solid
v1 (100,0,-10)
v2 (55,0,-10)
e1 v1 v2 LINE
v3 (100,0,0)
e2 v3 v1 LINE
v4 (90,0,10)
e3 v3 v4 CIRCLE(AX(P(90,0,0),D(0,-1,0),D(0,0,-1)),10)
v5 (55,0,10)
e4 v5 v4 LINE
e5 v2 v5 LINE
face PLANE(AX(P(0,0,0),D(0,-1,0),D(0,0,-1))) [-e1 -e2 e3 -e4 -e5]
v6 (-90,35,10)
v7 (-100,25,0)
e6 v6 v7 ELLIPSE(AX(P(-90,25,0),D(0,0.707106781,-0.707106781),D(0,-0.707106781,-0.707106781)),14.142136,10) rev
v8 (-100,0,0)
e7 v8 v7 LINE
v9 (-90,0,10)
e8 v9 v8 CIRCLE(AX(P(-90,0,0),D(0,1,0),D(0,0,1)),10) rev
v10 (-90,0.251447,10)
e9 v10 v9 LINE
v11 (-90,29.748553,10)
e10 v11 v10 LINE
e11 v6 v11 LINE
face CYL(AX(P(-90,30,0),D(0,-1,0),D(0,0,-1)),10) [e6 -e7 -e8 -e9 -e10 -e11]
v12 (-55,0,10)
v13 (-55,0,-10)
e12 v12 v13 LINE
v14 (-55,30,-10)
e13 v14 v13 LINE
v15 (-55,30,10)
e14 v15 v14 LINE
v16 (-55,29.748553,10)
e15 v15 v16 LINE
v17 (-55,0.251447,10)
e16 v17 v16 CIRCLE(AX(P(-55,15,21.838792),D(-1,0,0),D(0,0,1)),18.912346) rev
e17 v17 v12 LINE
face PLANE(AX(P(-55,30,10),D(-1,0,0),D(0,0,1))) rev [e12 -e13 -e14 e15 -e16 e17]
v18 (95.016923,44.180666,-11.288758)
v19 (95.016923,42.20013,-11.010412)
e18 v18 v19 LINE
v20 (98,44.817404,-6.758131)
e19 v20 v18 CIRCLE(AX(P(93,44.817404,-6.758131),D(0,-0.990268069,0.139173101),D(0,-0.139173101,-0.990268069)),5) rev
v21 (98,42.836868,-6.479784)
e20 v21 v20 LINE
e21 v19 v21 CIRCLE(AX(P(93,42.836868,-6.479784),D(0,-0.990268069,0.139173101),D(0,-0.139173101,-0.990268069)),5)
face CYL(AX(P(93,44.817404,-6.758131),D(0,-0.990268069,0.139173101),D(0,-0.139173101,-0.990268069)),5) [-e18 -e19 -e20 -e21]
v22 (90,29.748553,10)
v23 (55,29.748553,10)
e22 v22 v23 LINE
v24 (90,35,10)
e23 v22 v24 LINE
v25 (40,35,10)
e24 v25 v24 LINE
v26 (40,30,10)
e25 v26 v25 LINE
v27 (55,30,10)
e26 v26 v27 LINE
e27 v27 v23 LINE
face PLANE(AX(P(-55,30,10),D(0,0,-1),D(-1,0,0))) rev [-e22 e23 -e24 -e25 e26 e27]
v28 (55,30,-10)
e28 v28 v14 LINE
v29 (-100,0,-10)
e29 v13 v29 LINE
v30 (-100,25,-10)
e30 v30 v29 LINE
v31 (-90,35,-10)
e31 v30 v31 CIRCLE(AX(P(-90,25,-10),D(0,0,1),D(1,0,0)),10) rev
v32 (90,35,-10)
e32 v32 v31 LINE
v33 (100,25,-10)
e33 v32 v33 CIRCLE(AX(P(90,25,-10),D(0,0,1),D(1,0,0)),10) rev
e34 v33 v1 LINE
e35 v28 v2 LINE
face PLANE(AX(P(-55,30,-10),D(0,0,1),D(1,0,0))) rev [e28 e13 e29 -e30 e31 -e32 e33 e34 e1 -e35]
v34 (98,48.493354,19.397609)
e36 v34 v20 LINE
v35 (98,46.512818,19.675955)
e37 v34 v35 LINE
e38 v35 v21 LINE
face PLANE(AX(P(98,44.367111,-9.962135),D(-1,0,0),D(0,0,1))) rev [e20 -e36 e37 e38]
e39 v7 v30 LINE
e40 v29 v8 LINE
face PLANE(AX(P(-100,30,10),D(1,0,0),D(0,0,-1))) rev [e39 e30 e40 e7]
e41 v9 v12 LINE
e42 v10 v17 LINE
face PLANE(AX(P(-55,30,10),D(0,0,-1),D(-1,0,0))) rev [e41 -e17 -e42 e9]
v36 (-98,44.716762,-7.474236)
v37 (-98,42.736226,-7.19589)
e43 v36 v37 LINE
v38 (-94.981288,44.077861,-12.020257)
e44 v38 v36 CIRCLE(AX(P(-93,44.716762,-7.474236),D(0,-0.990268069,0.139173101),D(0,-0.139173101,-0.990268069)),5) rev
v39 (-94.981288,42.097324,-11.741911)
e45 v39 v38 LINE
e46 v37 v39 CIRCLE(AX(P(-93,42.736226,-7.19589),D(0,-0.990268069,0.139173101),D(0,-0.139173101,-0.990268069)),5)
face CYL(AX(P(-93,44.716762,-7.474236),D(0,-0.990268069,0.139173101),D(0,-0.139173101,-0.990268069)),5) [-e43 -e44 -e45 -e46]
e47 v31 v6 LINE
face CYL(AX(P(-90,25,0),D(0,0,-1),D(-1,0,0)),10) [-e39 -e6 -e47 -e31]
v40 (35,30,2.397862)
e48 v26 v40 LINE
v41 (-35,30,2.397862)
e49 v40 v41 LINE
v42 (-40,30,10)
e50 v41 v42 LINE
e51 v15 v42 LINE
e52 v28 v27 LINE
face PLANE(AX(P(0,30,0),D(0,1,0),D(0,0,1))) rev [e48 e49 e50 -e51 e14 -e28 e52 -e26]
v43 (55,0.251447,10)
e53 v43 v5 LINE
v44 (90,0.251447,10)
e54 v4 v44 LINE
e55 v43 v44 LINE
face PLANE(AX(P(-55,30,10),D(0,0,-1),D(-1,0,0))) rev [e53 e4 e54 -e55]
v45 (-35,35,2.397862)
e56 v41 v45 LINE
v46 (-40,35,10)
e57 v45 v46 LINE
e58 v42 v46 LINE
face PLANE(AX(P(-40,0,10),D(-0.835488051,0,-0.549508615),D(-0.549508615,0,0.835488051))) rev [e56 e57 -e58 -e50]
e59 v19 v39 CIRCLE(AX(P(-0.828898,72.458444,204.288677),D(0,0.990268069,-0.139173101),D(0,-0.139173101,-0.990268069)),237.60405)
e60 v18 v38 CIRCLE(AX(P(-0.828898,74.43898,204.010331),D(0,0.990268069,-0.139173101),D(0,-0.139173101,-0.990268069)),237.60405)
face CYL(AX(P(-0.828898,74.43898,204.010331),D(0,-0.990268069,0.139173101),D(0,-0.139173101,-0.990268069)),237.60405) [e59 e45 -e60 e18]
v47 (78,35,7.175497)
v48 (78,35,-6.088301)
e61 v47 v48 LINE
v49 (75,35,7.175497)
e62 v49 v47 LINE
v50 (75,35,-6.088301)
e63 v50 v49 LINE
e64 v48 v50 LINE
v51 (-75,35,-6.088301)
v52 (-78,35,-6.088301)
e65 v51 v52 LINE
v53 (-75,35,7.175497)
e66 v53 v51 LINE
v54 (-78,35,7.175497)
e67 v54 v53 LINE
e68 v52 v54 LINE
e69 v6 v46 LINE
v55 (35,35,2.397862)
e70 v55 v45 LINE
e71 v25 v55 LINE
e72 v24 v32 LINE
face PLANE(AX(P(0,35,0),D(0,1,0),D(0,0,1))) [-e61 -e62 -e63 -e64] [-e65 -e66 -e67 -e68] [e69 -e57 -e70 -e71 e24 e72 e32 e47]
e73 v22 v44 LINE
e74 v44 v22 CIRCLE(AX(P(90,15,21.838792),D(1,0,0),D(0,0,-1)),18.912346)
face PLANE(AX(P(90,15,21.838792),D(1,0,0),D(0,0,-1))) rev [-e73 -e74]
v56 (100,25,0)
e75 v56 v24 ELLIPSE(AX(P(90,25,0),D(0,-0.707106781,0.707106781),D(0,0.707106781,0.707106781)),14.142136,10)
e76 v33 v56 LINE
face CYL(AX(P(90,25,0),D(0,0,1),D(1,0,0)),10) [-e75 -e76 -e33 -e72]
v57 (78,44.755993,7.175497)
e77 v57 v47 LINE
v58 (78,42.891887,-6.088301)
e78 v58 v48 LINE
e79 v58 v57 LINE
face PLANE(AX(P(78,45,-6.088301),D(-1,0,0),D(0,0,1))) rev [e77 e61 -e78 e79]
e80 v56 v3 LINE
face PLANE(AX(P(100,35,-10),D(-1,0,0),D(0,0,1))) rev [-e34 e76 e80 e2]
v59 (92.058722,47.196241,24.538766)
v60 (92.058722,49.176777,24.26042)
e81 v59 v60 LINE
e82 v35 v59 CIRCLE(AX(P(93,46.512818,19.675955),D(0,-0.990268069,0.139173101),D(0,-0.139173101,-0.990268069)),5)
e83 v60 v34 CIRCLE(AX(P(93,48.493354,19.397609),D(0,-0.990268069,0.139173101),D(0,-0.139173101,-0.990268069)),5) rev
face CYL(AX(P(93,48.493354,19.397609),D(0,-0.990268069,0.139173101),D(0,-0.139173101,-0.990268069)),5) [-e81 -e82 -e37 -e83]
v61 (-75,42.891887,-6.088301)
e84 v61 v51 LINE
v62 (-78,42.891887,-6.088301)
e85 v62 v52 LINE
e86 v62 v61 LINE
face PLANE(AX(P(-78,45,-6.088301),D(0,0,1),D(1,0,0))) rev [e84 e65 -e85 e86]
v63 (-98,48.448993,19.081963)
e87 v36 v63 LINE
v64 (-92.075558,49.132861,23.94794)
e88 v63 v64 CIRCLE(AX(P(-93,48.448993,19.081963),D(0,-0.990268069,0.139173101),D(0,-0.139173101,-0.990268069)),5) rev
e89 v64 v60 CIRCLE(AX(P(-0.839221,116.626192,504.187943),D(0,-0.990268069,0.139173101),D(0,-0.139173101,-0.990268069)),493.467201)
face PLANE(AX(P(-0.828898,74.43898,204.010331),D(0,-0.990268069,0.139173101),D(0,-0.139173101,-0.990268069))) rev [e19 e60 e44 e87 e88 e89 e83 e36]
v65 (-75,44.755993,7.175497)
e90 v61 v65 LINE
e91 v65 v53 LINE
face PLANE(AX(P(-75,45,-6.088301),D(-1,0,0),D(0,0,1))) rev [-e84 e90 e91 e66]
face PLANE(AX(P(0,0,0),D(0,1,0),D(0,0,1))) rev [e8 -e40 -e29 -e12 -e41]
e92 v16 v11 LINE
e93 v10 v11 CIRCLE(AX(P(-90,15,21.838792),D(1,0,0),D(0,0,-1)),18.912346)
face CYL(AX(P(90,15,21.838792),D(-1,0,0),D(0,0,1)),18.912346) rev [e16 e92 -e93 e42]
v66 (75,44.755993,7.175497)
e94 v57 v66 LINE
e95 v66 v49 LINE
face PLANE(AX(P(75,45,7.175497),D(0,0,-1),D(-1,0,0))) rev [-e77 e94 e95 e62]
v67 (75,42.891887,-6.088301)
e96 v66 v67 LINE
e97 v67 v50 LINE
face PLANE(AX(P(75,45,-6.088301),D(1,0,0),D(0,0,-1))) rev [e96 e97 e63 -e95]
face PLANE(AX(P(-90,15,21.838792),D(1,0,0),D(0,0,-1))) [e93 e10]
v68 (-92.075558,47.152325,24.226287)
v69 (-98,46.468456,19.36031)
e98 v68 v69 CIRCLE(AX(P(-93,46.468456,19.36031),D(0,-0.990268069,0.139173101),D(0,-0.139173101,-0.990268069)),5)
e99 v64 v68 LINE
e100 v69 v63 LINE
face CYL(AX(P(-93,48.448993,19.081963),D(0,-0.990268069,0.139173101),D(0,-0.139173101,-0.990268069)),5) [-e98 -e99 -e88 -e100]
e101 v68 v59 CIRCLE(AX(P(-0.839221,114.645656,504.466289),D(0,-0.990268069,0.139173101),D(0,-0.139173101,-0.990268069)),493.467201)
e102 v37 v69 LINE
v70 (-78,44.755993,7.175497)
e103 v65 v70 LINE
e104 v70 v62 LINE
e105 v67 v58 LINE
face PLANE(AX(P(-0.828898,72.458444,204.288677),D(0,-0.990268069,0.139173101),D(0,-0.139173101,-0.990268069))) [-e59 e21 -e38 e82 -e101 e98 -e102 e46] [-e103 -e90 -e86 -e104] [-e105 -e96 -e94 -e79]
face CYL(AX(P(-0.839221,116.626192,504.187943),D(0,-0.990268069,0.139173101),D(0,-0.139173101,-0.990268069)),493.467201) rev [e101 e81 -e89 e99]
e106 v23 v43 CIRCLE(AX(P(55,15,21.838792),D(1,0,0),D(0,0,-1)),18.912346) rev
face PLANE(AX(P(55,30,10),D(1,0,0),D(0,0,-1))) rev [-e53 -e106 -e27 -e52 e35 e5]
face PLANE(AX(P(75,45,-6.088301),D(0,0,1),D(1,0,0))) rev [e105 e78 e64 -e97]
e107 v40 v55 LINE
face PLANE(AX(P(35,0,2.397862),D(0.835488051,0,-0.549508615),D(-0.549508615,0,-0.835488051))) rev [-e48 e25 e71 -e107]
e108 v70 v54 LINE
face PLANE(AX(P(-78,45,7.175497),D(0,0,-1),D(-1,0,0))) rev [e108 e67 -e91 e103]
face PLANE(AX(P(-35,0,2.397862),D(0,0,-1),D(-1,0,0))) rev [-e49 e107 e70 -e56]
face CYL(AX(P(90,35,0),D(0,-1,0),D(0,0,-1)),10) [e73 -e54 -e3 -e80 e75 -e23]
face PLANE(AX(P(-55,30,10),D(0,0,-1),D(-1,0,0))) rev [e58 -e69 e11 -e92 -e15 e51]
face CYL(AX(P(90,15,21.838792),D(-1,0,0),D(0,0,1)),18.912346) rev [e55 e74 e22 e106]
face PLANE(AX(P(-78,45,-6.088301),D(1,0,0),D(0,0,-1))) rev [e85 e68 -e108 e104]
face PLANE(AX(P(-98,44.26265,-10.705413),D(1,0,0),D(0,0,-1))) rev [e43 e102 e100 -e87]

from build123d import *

# Parameters (mm, degrees)
SKETCH1_W               = 45
SKETCH1_H               = 20
BOSS_EXTRUDE1_DEPTH     = 30
BOSS_EXTRUDE1_2_DEPTH   = 30
CUT_EXTRUDE1_DEPTH      = 90
CUT_EXTRUDE1_DEPTH_BACK = 90
SKETCH2_R               = 18.91234553
SKETCH4_W               = 200
SKETCH4_H               = 20
BOSS_EXTRUDE2_DEPTH     = 5
FILLET1_R               = 10
SKETCH5_W               = 3
SKETCH5_H               = 13.263798278
BOSS_EXTRUDE3_DEPTH     = 10
CHAMFER1_SIZE           = 2.108112521
CHAMFER1_SIZE_2         = 15
BOSS_EXTRUDE4_DEPTH     = 2
FILLET2_R               = 5
CUT_EXTRUDE2_DEPTH      = 111.469562822


# Some blends are built 0.0001 mm under size
with BuildPart() as part:
    # Sketch1 → Boss-Extrude1 (new body)
    with BuildSketch(Plane(origin=(0, 0, 0), x_dir=(1, 0, 0), z_dir=(0, 1, 0))):
        with Locations((-77.5, 0)):
            Rectangle(SKETCH1_W, SKETCH1_H)
    extrude(amount=BOSS_EXTRUDE1_DEPTH)


with BuildPart() as body_2:
    # Sketch1 → Boss-Extrude1 2 (new body)
    with BuildSketch(Plane(origin=(0, 0, 0), x_dir=(1, 0, 0), z_dir=(0, 1, 0))):
        with Locations((77.5, 0)):
            Rectangle(SKETCH1_W, SKETCH1_H)
    extrude(amount=BOSS_EXTRUDE1_2_DEPTH)


with BuildPart() as cut_extrude1_tool:
    # Sketch2 → Cut-Extrude1 (new, two sides: drawn at the far end of the back side and taken through both)
    with BuildSketch(Plane(origin=(0, 0, 0), x_dir=(0, 0, -1), z_dir=(1, 0, 0)).offset(-CUT_EXTRUDE1_DEPTH_BACK)):
        with Locations((-21.83879207, 15)):
            Circle(SKETCH2_R)
    extrude(amount=CUT_EXTRUDE1_DEPTH + CUT_EXTRUDE1_DEPTH_BACK)


with BuildPart() as part_1:
    add(part.part)

    # Cut-Extrude1: cut by cut_extrude1_tool
    add(cut_extrude1_tool.part, mode=Mode.SUBTRACT)



with BuildPart() as body_2_1:
    add(body_2.part)

    # Cut-Extrude1: cut by cut_extrude1_tool
    add(cut_extrude1_tool.part, mode=Mode.SUBTRACT)


with BuildPart() as part_2:
    add(part_1.part)

    add(body_2_1.part)  # Boss-Extrude2 merges body 2
    # Sketch4 → Boss-Extrude2 (add)
    with BuildSketch(Plane(origin=(0, 30, 0), x_dir=(1, 0, 0), z_dir=(0, 1, 0))):
        Rectangle(SKETCH4_W, SKETCH4_H)
    extrude(amount=BOSS_EXTRUDE2_DEPTH)

    # Fillet1
    fillet1_edges = [part_2.edges().sort_by_distance(p)[0] for p in [
        (100, 17.5, 10),
        (-100, 35, 0),
        (100, 35, 0),
        (-100, 17.5, 10),
    ]]
    fillet(fillet1_edges, radius=FILLET1_R - 0.0001)  # a hair under: the kernel refuses the full size

    # Sketch5 → Boss-Extrude3 (add)
    with BuildSketch(Plane(origin=(0, 35, 0), x_dir=(1, 0, 0), z_dir=(0, 1, 0))):
        with Locations((-76.5, -0.54359829)):
            Rectangle(SKETCH5_W, SKETCH5_H)
        with Locations((76.5, -0.54359829)):
            Rectangle(SKETCH5_W, SKETCH5_H)
    extrude(amount=BOSS_EXTRUDE3_DEPTH)

    # Chamfer1
    # the kernel refuses this chamfer: 15, 2.108112521 mm, written as the material it takes off along each edge
    with BuildSketch(Plane(origin=(-116.985961034, 45, -6.088300849), x_dir=(0, -0.9651598825854408, -0.26166085119417143), z_dir=(1, 0, 0)), Plane(origin=(36.014038966, 45, -6.088300849), x_dir=(0, -0.9651598825854406, -0.26166085119417176), z_dir=(1, 0, 0))) as chamfer1_piece_1:
        Polygon((CHAMFER1_SIZE * 0.965159882373, -CHAMFER1_SIZE * 0.261660851137), (-CHAMFER1_SIZE_2 * 0.261660851194, -CHAMFER1_SIZE_2 * 0.965159882585), (0, 0), align=None)
    extrude(amount=80.971922068, mode=Mode.SUBTRACT)

    # Sketch6 → Boss-Extrude4 (add)
    with BuildSketch(Plane(origin=(0, 42.900189564, -6.02922845), x_dir=(1, 0, 0), z_dir=(0, 0.9902680687415693, -0.13917310096007307))):
        with BuildLine():
            Line((-98, 4.441058829), (-98, -31.70498546))
            ThreePointArc((-98, -31.70498546), (0.017055636, -22.045990643), (98, -32.045090114))
            Line((98, -32.045090114), (98, 3.690476172))
            ThreePointArc((98, 3.690476172), (0.081000585, 25.217488155), (-98, 4.441058829))
        make_face()
    extrude(amount=BOSS_EXTRUDE4_DEPTH)

    # Fillet2
    fillet2_edges = [part_2.edges().sort_by_distance(p)[0] for p in [
        (98, 43.37684262, -9.822962262),
        (-98, 43.272381704, -10.566240301),
        (-98, 48.302938775, 25.22803317),
        (98, 48.350272194, 25.564827949),
    ]]
    fillet(fillet2_edges, radius=FILLET2_R)

    # Sketch7 → Cut-Extrude2 (cut, through all)
    with BuildSketch(Plane(origin=(0, 35, 0), x_dir=(1, 0, 0), z_dir=(0, 1, 0))):
        Polygon((-40, -10), (-35, -2.397862122), (35, -2.397862122), (40, -10), align=None)
    extrude(amount=-CUT_EXTRUDE2_DEPTH, mode=Mode.SUBTRACT)


solid = part_2.part
